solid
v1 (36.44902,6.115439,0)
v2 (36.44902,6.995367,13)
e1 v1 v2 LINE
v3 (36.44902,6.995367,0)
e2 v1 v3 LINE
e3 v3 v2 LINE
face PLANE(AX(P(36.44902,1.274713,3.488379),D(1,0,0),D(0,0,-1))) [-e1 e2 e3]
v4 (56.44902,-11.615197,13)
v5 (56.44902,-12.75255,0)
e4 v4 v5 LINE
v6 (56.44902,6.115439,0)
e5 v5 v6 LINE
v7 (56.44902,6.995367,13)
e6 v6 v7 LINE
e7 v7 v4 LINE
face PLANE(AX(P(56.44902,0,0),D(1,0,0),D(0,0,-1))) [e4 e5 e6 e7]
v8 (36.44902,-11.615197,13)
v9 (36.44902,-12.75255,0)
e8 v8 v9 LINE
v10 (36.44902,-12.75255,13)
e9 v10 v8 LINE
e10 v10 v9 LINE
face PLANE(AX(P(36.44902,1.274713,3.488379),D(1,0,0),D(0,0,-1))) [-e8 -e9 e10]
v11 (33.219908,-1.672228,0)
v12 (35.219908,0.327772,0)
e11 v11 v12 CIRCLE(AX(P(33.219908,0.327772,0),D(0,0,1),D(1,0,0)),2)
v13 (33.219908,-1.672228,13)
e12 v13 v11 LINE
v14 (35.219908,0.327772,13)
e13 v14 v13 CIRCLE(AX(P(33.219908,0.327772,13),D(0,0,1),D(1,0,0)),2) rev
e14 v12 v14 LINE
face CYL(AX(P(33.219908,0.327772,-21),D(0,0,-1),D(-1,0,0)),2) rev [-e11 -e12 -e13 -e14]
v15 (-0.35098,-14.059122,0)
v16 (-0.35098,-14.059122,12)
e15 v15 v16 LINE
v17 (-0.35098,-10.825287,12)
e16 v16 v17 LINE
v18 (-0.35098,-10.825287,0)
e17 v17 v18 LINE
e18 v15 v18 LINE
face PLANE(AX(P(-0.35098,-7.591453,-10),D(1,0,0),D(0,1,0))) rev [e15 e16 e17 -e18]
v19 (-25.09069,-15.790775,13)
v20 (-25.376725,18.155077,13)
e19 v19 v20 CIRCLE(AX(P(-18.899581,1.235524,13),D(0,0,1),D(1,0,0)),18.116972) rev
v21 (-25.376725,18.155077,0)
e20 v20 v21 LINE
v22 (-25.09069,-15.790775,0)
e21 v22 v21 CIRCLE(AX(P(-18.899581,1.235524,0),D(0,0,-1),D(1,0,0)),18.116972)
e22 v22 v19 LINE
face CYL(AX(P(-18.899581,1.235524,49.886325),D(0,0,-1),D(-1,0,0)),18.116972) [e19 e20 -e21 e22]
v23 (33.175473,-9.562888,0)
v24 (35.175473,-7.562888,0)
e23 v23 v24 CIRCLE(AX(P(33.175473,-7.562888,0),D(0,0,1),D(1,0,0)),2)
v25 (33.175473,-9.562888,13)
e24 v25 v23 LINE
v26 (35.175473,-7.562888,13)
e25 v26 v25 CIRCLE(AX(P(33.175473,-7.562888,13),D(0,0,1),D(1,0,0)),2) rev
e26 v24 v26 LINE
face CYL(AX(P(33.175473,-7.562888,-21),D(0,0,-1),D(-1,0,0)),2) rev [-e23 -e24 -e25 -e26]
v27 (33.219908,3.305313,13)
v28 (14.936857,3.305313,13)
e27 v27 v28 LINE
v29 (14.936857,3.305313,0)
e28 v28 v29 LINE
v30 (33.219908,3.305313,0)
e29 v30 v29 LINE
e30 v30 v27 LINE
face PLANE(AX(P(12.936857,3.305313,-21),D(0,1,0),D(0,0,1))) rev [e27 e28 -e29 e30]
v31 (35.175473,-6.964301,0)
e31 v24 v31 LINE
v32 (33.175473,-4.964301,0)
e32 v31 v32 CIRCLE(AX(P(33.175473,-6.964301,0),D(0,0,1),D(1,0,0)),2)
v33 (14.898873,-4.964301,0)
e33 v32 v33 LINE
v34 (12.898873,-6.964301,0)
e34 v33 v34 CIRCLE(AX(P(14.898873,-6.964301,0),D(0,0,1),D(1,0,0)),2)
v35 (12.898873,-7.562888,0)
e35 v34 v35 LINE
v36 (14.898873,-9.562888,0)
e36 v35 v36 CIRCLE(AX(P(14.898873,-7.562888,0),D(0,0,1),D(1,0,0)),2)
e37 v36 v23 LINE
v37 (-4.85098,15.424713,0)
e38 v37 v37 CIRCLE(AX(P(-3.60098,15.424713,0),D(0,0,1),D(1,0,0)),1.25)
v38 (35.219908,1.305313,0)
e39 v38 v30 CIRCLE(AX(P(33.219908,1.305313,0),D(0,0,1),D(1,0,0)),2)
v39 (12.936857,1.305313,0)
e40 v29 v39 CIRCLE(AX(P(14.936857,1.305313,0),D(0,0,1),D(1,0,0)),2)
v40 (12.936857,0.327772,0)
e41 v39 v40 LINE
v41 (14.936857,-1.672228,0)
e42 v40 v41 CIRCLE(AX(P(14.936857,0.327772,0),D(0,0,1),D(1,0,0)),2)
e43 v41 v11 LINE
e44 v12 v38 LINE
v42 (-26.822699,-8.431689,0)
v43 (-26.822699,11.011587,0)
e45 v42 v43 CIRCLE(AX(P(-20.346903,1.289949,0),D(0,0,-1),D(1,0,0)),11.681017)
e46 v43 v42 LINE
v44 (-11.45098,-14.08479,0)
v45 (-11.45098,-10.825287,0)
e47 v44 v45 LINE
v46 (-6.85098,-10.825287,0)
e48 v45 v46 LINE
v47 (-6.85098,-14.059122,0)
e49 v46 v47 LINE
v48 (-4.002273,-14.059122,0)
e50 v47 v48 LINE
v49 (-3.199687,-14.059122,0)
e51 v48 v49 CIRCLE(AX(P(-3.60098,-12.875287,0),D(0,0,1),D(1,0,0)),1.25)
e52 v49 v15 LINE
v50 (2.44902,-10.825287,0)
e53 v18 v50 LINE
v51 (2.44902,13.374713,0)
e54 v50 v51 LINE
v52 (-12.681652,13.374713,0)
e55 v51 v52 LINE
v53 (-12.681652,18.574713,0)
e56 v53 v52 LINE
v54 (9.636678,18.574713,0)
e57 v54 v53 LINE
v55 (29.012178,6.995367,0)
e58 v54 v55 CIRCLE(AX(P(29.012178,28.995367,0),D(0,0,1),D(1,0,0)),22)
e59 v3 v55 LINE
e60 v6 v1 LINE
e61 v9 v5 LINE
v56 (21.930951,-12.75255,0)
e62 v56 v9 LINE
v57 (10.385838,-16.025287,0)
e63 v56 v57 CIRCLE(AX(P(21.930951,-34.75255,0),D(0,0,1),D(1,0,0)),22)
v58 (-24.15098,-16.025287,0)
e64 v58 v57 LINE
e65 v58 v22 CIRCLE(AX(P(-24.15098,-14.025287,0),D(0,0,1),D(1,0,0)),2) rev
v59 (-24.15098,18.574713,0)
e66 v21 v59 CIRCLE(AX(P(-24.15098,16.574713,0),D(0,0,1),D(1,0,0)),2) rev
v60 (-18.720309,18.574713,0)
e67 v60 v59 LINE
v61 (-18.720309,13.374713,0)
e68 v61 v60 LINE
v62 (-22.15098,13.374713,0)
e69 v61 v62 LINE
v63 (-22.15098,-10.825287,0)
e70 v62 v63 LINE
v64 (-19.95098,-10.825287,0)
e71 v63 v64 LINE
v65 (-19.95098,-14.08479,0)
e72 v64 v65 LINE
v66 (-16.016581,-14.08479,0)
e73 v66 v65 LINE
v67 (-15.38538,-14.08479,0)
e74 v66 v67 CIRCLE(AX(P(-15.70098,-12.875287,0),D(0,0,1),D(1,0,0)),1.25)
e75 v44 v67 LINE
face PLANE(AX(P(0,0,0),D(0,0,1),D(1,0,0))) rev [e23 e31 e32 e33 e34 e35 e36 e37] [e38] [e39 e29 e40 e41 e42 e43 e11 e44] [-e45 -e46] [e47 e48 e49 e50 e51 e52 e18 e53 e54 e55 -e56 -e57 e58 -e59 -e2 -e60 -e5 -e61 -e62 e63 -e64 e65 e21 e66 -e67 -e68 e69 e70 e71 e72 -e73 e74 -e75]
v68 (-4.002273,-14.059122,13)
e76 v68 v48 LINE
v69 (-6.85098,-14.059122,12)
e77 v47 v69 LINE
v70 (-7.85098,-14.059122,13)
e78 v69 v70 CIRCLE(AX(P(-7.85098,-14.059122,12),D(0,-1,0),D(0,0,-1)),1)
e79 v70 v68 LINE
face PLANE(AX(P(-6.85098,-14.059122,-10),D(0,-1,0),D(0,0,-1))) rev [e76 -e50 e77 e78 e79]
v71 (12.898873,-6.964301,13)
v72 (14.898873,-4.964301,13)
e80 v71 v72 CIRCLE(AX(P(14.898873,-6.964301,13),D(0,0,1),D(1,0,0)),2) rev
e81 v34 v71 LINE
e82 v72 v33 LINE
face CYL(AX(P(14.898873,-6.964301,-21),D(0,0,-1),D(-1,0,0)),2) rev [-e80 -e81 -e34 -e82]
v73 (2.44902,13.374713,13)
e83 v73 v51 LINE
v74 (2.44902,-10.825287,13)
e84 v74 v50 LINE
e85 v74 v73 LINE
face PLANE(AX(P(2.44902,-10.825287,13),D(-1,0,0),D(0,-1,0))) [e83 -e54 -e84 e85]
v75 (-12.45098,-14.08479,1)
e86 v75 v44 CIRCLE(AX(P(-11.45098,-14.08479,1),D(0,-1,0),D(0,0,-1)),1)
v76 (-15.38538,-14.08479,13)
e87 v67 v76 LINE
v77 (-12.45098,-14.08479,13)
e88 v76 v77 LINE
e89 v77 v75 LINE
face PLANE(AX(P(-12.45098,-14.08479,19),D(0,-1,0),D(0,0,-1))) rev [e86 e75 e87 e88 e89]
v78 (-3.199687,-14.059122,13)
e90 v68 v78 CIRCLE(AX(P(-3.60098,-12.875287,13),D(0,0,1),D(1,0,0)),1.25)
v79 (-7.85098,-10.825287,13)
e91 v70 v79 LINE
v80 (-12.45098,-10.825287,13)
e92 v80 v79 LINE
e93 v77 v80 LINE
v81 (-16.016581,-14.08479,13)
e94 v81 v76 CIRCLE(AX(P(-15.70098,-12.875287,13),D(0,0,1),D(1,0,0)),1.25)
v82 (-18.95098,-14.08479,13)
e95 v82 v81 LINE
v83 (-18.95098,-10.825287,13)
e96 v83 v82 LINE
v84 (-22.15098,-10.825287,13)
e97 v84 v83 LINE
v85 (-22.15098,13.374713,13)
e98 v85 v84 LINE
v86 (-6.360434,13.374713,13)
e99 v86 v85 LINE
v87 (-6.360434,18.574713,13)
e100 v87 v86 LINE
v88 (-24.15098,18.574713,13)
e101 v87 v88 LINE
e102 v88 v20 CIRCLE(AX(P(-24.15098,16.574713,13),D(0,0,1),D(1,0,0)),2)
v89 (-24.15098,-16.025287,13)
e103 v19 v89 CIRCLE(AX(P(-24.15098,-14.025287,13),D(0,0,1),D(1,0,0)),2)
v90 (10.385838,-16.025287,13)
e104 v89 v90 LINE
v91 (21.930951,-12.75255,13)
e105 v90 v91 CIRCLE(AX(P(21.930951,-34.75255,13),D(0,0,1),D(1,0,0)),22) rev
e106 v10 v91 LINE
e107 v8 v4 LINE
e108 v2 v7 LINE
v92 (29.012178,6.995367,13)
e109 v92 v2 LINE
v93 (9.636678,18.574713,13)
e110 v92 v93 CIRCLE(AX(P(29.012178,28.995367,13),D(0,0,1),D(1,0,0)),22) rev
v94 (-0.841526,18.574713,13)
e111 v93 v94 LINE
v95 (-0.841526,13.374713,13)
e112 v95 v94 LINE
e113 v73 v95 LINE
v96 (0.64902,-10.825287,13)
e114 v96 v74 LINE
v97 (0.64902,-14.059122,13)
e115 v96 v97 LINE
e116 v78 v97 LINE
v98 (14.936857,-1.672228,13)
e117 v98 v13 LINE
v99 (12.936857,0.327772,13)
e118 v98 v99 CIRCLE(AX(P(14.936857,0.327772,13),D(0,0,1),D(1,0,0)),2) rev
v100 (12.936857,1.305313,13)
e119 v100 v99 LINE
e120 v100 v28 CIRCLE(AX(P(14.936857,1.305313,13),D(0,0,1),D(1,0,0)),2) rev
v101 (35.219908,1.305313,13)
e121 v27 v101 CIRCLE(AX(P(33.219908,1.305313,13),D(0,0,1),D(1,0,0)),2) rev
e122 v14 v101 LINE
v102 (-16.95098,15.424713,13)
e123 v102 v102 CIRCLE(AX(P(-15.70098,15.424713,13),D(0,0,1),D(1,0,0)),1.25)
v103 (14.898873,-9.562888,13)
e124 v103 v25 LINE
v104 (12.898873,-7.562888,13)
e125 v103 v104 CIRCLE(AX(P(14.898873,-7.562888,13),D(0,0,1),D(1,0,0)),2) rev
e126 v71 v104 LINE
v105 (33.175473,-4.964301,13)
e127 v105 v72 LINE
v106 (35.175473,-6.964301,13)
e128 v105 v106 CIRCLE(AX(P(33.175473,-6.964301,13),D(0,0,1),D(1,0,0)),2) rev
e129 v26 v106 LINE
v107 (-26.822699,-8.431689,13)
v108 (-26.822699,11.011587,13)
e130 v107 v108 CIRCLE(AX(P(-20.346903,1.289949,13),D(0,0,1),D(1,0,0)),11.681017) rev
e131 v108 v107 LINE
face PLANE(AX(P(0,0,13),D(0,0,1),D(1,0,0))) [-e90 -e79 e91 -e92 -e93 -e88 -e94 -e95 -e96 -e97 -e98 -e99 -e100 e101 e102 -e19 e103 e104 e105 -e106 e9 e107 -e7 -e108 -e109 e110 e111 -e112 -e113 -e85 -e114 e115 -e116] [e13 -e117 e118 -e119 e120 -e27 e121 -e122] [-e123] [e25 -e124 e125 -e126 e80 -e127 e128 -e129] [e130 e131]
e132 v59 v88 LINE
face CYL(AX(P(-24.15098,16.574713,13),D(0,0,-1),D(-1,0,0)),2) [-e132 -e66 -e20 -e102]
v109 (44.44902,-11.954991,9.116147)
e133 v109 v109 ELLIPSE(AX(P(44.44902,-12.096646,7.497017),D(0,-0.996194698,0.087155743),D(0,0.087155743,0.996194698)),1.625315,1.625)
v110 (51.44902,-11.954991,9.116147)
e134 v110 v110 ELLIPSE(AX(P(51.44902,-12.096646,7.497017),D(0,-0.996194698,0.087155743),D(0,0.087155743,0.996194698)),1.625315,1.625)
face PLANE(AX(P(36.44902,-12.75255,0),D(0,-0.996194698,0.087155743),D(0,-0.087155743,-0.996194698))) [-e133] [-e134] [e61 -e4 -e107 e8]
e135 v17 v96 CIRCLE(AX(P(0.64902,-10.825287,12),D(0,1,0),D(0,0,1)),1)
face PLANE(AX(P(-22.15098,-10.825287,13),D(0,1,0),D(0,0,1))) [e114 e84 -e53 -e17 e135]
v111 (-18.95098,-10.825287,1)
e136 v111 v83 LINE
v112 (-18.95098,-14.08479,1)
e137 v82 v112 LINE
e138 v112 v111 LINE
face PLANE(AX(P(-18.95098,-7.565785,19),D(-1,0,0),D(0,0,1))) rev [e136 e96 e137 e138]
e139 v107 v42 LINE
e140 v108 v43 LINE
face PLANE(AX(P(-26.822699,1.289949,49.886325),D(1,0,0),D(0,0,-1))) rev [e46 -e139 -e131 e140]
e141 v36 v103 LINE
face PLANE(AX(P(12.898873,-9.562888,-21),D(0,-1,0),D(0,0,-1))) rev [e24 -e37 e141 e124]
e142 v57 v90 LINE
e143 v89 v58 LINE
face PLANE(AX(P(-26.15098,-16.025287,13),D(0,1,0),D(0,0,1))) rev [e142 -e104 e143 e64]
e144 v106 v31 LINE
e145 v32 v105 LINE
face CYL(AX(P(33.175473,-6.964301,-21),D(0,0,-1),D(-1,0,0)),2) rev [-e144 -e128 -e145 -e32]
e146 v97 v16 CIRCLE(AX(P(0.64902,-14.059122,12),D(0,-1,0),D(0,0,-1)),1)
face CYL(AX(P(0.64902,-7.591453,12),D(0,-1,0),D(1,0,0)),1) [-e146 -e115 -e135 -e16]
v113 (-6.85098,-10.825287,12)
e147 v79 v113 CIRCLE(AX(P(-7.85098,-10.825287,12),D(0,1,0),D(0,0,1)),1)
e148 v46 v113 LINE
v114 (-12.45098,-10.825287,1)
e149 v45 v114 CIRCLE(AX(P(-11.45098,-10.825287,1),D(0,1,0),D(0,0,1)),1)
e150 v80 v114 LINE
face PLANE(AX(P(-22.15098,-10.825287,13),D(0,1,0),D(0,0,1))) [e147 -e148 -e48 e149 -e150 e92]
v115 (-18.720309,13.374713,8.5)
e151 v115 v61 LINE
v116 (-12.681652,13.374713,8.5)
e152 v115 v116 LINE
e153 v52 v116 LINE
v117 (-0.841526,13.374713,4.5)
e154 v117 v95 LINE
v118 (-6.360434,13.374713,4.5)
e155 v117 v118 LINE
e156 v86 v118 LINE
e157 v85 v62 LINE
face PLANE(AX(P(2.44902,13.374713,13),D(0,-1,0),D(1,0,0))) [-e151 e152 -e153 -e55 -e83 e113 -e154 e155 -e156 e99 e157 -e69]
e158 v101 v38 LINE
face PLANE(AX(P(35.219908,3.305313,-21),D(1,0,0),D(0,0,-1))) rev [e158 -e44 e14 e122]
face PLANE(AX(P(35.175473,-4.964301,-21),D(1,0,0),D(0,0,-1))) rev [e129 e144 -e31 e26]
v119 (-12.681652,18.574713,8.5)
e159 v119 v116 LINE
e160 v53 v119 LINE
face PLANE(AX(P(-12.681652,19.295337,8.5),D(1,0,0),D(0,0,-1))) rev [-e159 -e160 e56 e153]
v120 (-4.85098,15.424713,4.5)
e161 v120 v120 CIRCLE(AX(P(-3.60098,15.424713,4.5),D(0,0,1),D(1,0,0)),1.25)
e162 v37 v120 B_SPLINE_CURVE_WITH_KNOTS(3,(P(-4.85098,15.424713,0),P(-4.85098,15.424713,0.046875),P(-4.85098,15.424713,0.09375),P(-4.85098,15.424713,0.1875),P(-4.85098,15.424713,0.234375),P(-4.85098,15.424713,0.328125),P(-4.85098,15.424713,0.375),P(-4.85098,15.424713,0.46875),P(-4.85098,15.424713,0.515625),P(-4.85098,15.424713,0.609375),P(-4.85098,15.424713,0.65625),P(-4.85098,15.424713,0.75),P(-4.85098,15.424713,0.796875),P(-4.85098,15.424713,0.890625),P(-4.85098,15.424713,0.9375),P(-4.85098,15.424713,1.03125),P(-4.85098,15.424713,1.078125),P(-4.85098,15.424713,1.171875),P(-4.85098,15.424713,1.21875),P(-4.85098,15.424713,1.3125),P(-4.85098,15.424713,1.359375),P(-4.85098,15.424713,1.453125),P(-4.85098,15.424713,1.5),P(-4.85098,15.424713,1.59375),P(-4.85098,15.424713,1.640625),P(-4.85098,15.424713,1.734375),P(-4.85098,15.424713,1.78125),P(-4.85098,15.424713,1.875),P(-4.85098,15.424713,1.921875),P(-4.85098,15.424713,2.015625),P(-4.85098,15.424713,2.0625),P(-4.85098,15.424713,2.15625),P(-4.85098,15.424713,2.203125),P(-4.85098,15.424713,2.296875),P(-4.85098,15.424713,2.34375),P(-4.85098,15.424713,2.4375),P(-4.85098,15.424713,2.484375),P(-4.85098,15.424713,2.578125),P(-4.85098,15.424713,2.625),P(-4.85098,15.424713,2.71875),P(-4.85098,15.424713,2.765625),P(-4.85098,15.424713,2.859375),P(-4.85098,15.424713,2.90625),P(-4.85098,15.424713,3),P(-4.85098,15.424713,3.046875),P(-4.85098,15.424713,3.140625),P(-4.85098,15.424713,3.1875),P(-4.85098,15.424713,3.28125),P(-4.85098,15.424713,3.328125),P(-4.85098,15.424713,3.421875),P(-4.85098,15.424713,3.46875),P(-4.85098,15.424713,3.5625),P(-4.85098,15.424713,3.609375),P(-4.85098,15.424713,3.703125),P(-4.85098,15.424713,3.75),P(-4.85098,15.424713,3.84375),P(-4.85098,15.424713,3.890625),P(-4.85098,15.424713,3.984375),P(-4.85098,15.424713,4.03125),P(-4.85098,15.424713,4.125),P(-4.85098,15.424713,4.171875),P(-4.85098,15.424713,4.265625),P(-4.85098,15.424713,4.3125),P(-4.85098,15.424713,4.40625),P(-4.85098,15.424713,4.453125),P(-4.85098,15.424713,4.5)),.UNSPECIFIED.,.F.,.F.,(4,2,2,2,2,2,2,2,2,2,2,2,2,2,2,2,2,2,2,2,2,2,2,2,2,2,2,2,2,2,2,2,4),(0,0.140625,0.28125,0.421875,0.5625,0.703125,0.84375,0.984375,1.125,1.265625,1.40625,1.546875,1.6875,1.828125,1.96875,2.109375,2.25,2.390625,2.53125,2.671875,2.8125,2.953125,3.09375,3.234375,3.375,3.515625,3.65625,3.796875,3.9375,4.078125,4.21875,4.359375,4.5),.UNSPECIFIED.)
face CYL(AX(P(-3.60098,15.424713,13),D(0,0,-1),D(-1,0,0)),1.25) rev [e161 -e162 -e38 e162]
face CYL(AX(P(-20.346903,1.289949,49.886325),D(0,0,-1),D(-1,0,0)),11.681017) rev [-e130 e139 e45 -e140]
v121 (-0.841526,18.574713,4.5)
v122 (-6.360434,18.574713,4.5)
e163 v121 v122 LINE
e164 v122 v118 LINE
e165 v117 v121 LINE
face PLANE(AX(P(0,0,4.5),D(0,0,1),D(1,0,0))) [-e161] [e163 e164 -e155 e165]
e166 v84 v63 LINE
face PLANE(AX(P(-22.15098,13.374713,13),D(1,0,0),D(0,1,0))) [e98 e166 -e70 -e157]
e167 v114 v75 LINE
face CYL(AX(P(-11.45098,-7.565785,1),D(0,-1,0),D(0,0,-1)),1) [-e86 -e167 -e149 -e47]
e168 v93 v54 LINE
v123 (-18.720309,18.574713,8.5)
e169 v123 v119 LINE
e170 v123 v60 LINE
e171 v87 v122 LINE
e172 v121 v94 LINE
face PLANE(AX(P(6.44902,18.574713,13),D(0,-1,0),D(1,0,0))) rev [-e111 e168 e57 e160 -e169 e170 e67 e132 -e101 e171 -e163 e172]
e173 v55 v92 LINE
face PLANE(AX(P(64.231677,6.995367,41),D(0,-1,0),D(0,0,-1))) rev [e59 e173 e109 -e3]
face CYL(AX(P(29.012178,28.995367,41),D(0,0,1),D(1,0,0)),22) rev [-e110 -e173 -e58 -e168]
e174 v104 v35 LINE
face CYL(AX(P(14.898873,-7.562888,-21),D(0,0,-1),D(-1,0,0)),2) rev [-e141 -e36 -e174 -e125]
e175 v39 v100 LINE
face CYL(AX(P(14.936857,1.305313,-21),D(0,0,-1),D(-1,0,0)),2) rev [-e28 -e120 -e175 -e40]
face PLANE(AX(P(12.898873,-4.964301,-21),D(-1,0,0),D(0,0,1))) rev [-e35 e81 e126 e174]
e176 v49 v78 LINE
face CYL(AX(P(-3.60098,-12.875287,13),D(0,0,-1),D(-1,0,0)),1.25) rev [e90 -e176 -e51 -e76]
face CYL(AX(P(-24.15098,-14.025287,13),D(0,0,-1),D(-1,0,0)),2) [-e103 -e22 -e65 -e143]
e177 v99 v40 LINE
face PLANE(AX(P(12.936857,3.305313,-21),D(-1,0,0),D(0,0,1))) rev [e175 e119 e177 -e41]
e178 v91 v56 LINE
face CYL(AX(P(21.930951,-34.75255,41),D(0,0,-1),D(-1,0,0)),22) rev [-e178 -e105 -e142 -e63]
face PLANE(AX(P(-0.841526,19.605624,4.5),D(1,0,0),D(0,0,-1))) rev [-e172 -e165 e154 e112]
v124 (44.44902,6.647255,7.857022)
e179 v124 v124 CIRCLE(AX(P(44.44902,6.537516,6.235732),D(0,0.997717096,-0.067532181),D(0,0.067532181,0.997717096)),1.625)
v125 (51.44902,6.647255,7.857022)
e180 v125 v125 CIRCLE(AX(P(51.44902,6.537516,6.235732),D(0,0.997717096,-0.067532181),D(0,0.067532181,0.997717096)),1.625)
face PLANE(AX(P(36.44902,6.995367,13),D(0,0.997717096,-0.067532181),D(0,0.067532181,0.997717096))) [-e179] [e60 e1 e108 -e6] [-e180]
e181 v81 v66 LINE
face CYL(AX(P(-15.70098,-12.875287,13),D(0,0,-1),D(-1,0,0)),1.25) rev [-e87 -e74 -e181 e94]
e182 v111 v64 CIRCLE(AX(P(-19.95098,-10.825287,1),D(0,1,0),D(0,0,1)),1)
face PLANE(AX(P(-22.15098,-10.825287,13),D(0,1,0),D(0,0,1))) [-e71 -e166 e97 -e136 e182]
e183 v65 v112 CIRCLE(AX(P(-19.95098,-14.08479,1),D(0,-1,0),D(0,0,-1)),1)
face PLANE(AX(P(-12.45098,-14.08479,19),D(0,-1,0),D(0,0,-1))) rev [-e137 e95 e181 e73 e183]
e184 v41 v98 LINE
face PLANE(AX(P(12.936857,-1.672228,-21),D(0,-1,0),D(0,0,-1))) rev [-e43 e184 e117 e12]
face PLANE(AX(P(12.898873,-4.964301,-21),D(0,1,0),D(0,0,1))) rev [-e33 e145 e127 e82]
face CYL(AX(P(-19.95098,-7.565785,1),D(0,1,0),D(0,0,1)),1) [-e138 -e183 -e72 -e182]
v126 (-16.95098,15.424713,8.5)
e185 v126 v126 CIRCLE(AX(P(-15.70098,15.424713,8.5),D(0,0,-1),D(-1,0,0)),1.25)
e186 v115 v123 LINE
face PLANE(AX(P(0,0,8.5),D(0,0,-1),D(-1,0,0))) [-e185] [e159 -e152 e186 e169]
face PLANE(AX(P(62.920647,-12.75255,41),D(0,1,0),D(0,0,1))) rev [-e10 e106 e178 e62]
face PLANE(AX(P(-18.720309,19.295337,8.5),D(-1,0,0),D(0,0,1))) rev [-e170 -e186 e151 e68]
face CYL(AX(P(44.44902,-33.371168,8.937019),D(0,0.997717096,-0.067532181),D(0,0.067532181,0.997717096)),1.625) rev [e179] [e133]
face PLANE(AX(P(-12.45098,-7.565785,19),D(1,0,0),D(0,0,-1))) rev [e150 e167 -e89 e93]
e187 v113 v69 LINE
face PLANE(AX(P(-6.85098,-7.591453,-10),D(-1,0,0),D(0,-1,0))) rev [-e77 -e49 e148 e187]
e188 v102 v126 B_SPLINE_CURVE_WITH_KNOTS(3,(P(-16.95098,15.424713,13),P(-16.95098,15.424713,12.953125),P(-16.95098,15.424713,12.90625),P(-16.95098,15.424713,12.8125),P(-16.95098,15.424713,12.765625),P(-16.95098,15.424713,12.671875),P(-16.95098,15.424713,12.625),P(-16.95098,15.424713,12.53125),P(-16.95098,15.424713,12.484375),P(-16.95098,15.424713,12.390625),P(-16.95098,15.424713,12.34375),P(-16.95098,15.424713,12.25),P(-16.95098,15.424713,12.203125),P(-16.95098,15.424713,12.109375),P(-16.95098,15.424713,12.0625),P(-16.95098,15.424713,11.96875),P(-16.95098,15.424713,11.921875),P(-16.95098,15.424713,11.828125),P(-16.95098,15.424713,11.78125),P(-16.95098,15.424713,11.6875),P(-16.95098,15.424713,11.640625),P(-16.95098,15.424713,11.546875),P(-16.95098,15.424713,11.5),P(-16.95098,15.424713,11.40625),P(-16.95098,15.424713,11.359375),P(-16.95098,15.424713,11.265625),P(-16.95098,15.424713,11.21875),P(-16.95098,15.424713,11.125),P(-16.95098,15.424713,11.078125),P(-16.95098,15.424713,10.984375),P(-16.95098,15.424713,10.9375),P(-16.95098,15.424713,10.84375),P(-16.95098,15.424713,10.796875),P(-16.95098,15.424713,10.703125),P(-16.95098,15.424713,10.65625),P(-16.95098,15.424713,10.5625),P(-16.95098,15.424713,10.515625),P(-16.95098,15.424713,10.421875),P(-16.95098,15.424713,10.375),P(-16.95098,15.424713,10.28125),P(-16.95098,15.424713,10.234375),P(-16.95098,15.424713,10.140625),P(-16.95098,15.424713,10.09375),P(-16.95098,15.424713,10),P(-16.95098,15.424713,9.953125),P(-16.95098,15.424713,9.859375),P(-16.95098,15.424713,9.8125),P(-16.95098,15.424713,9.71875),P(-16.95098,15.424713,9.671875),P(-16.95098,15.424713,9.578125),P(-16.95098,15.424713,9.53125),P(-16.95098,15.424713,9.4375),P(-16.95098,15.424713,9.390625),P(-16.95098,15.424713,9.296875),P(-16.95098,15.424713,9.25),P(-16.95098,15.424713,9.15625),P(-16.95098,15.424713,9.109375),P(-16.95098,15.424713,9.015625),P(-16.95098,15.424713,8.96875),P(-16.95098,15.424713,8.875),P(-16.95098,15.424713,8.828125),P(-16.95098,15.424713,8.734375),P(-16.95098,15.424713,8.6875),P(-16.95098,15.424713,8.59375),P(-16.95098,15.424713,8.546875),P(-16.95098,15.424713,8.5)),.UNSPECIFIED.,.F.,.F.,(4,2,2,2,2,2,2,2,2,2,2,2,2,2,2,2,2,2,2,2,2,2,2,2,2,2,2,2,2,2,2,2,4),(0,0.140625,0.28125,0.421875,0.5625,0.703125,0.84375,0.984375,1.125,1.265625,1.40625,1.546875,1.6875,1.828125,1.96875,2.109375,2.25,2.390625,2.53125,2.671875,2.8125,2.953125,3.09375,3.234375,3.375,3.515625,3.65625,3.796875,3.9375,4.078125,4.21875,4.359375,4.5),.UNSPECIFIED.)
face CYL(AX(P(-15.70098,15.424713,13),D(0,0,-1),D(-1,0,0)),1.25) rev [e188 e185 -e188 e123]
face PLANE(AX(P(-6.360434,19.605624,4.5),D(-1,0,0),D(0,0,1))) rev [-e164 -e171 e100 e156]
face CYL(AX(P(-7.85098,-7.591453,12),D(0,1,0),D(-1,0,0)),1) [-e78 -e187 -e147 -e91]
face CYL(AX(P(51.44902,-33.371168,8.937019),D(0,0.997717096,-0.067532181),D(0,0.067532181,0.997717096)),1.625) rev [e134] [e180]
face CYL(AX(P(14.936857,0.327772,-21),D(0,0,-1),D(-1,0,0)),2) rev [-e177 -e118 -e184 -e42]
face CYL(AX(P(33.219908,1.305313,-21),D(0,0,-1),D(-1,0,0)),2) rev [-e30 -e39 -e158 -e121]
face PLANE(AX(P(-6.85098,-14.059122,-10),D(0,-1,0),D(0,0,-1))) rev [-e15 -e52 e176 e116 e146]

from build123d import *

# Parameters (mm, degrees)
SKETCH_1_W           = 32.6
SKETCH_1_H           = 34.6
SKETCH_1_R           = 1.25
SKETCH_1_W_2         = 24.6
SKETCH_1_H_2         = 24.2
EXTRUDE_1_DEPTH      = 13
SKETCH_3_W           = 6.5
SKETCH_3_H           = 6.519005167
CUT_EXTRUDE_1_DEPTH  = 19
SKETCH_4_W           = 6.5
SKETCH_4_H           = 6.467668889
CUT_EXTRUDE_2_DEPTH  = 23
EXTRUDE_2_DEPTH      = 50
SKETCH_1_2_W         = 22.27659965
SKETCH_1_2_H         = 4.598586669
SKETCH_1_2_W_2       = 22.283050596
SKETCH_1_2_H_2       = 4.977540741
CUT_EXTRUDE_5_DEPTH  = 34
FILLET_1_R           = 2
FILLET_2_R           = 2
FILLET_5_R           = 1
SKETCH_9_W           = 54.594998093
SKETCH_9_H           = 18.111982385
SKETCH_9_W_2         = 52.534809486
SKETCH_9_H_2         = 12.989301534
CUT_EXTRUDE_6_DEPTH  = 41
FILLET_6_R           = 22
EXTRUDE_4_DEPTH      = 13
SKETCH_13_W          = 5.518907879
SKETCH_13_H          = 8.361822047
CUT_EXTRUDE_8_DEPTH  = 8.5
SKETCH_14_W          = 6.038657432
SKETCH_14_H          = 7.741248121
CUT_EXTRUDE_9_DEPTH  = 8.5
SKETCH_15_OUTSIDE_W  = 35.102
SKETCH_15_OUTSIDE_H  = 56.702
CUT_EXTRUDE_11_DEPTH = 20
SKETCH_20_R          = 1.625
CUT_EXTRUDE_15_DEPTH = 40


with BuildPart() as part:
    # Sketch 1 → 凸台-拉伸1 (new body)
    with BuildSketch(Plane.XY):
        with Locations((-9.850980392, 1.274712581)):
            Rectangle(SKETCH_1_W, SKETCH_1_H)
        with Locations(Location((-15.700980392, 15.424712581, 0), (0, 0, 180))):
            Circle(SKETCH_1_R, mode=Mode.SUBTRACT)
        with Locations(Location((-3.600980392, 15.424712581, 0), (0, 0, 180))):
            Circle(SKETCH_1_R, mode=Mode.SUBTRACT)
        with Locations(Location((-15.700980392, -12.875287419, 0), (0, 0, 180))):
            Circle(SKETCH_1_R, mode=Mode.SUBTRACT)
        with Locations(Location((-3.600980392, -12.875287419, 0), (0, 0, 180))):
            Circle(SKETCH_1_R, mode=Mode.SUBTRACT)
        with Locations((-9.850980392, 1.274712581)):
            Rectangle(SKETCH_1_W_2, SKETCH_1_H_2, mode=Mode.SUBTRACT)
    extrude(amount=EXTRUDE_1_DEPTH)

    # 草图3 → 切除-拉伸1 (cut)
    with BuildSketch(Plane(origin=(0, 0, 0), x_dir=(-1, 0, 0), z_dir=(0, 0, -1))):
        with Locations((15.700980392, -10.82528742)):
            Rectangle(SKETCH_3_W, SKETCH_3_H)
    extrude(amount=-CUT_EXTRUDE_1_DEPTH, mode=Mode.SUBTRACT)

    # 草图4 → 切除-拉伸2 (cut)
    with BuildSketch(Plane.XY.offset(13)):
        with Locations((-3.600980392, -10.82528742)):
            Rectangle(SKETCH_4_W, SKETCH_4_H)
    extrude(amount=-CUT_EXTRUDE_2_DEPTH, mode=Mode.SUBTRACT)

    # 草图5 → 凸台-拉伸2 (add)
    with BuildSketch(Plane(origin=(6.449019608, 0, 0), x_dir=(0, 0, -1), z_dir=(1, 0, 0))):
        Polygon((-13, 18.574712581), (-13, 10.055461473), (-13, -16.025287419), (0, -16.025287419), (0, -15.027567927), (0, 16.282461831), (0, 18.574712581), align=None)
    extrude(amount=EXTRUDE_2_DEPTH)

    # Sketch 1 2 → 切除-拉伸5 (cut)
    with BuildSketch(Plane.XY.offset(13)):
        with Locations((24.037173058, -7.263594431)):
            Rectangle(SKETCH_1_2_W, SKETCH_1_2_H)
        with Locations((24.078382453, 0.81654228)):
            Rectangle(SKETCH_1_2_W_2, SKETCH_1_2_H_2)
    extrude(amount=-CUT_EXTRUDE_5_DEPTH, mode=Mode.SUBTRACT)

    # 圆角1
    fillet_1_edges = [part.edges().sort_by_distance(p)[0] for p in [
        (12.936857155, -1.672228091, 6.5),
        (12.936857155, 3.30531265, 6.5),
        (35.219907751, 3.30531265, 6.5),
        (35.219907751, -1.672228091, 6.5),
        (12.898873233, -9.562887765, 6.5),
        (12.898873233, -4.964301096, 6.5),
        (35.175472883, -4.964301096, 6.5),
        (35.175472883, -9.562887765, 6.5),
    ]]
    fillet(fillet_1_edges, radius=FILLET_1_R)

    # 圆角2
    fillet_2_edges = [part.edges().sort_by_distance(p)[0] for p in [
        (-26.150980392, -16.025287419, 6.5),
        (-26.150980392, 18.574712581, 6.5),
    ]]
    fillet(fillet_2_edges, radius=FILLET_2_R)

    # 圆角5
    fillet_5_edges = [part.edges().sort_by_distance(p)[0] for p in [
        (-12.450980392, -12.455038711, 0),
        (-18.950980392, -12.455038711, 0),
        (-6.850980392, -12.442204642, 13),
        (-0.350980392, -12.442204642, 13),
    ]]
    fillet(fillet_5_edges, radius=FILLET_5_R)

    # 草图9 → 切除-拉伸6 (cut)
    with BuildSketch(Plane(origin=(0, 0, 0), x_dir=(-1, 0, 0), z_dir=(0, 0, -1))):
        with Locations((-36.934177516, 16.051357777)):
            Rectangle(SKETCH_9_W, SKETCH_9_H)
        with Locations((-36.653242706, -19.247200889)):
            Rectangle(SKETCH_9_W_2, SKETCH_9_H_2)
    extrude(amount=-CUT_EXTRUDE_6_DEPTH, mode=Mode.SUBTRACT)

    # 圆角6
    # the kernel refuses this fillet: 22 mm, written as the material it adds along each edge
    with BuildSketch(Plane(origin=(9.636678469, 6.995366584, 0), x_dir=(0, 1, 0), z_dir=(0, 0, 1))) as fillet_6_piece_1:
        with BuildLine():
            CenterArc((22, -19.375499223), FILLET_6_R, 118.272534833, 61.727465167)
            Line((0, -19.375499223), (-0.44, -19.375499223))
            Line((-0.44, -19.375499223), (-0.44, 0))
            Line((-0.44, 0), (0, 0.44))
            ThreePointArc((0, 0.44), (5.789672998, 0.44), (11.370932916, 0.387509984))
            Line((11.370932916, 0.387509984), (11.579345996, 0))
        make_face()
    extrude(amount=13)
    with BuildSketch(Plane(origin=(10.385837963, -12.752550122, 0), x_dir=(1, 0, 0), z_dir=(0, 0, 1))) as fillet_6_piece_2:
        with BuildLine():
            CenterArc((11.54511289, -22), FILLET_6_R, 90, 31.653290012)
            Line((0, -3.272737297), (-0.230902258, -2.898192043))
            ThreePointArc((-0.230902258, -2.898192043), (-0.44, -1.636368649), (-0.44, 0))
            Line((-0.44, 0), (0, 0.44))
            Line((0, 0.44), (11.54511289, 0.44))
            Line((11.54511289, 0.44), (11.54511289, 0))
        make_face()
    extrude(amount=13)

    # 草图12 → 凸台-拉伸4 (add)
    with BuildSketch(Plane(origin=(0, 0, 0), x_dir=(-1, 0, 0), z_dir=(0, 0, -1))):
        with BuildLine():
            Line((24.150980392, 18.574712581), (24.496655084, -15.99518818))
            ThreePointArc((24.496655084, -15.99518818), (37.015647173, 1.416671567), (24.150980392, 18.574712581))
        make_face()
        with BuildLine():
            Line((26.822698684, 1.289948959), (26.822698684, -8.431688638))
            ThreePointArc((26.822698684, -8.431688638), (32.027920461, 1.289948959), (26.822698684, 11.011586556))
            Line((26.822698684, 11.011586556), (26.822698684, 1.289948959))
        make_face(mode=Mode.SUBTRACT)
    extrude(amount=-EXTRUDE_4_DEPTH)

    # 草图13 → 切除-拉伸8 (cut)
    with BuildSketch(Plane.XY.offset(13)):
        with Locations((-3.600980393, 15.424712581)):
            Rectangle(SKETCH_13_W, SKETCH_13_H)
    extrude(amount=-CUT_EXTRUDE_8_DEPTH, mode=Mode.SUBTRACT)

    # 草图14 → 切除-拉伸9 (cut)
    with BuildSketch(Plane(origin=(0, 0, 0), x_dir=(-1, 0, 0), z_dir=(0, 0, -1))):
        with Locations((15.700980392, 15.424712581)):
            Rectangle(SKETCH_14_W, SKETCH_14_H)
    extrude(amount=-CUT_EXTRUDE_9_DEPTH, mode=Mode.SUBTRACT)

    # 草图15 outside → 切除-拉伸11 (cut)
    with BuildSketch(Plane(origin=(56.449019608, 0, 0), x_dir=(0, 0, -1), z_dir=(1, 0, 0))):
        with Locations((-6.5, 1.275)):
            Rectangle(SKETCH_15_OUTSIDE_W, SKETCH_15_OUTSIDE_H)
        Polygon((-13, 6.995366584), (6.023241537, 5.707746072), (0, -12.752550122), (-13, -11.615197497), align=None, mode=Mode.SUBTRACT)
    extrude(amount=-CUT_EXTRUDE_11_DEPTH, mode=Mode.SUBTRACT)

    # 草图20 → 切除-拉伸15 (cut)
    with BuildSketch(Plane(origin=(0, 6.087549391, -0.412046152), x_dir=(1, 0, 0), z_dir=(0, 0.9977170964112915, -0.06753218142946318))):
        with Locations(Location((44.449019608, -6.662988966, 0), (0, 0, 270))):
            Circle(SKETCH_20_R)
        with Locations(Location((51.449019608, -6.662988966, 0), (0, 0, 270))):
            Circle(SKETCH_20_R)
    extrude(amount=-CUT_EXTRUDE_15_DEPTH, mode=Mode.SUBTRACT)


solid = part.part
